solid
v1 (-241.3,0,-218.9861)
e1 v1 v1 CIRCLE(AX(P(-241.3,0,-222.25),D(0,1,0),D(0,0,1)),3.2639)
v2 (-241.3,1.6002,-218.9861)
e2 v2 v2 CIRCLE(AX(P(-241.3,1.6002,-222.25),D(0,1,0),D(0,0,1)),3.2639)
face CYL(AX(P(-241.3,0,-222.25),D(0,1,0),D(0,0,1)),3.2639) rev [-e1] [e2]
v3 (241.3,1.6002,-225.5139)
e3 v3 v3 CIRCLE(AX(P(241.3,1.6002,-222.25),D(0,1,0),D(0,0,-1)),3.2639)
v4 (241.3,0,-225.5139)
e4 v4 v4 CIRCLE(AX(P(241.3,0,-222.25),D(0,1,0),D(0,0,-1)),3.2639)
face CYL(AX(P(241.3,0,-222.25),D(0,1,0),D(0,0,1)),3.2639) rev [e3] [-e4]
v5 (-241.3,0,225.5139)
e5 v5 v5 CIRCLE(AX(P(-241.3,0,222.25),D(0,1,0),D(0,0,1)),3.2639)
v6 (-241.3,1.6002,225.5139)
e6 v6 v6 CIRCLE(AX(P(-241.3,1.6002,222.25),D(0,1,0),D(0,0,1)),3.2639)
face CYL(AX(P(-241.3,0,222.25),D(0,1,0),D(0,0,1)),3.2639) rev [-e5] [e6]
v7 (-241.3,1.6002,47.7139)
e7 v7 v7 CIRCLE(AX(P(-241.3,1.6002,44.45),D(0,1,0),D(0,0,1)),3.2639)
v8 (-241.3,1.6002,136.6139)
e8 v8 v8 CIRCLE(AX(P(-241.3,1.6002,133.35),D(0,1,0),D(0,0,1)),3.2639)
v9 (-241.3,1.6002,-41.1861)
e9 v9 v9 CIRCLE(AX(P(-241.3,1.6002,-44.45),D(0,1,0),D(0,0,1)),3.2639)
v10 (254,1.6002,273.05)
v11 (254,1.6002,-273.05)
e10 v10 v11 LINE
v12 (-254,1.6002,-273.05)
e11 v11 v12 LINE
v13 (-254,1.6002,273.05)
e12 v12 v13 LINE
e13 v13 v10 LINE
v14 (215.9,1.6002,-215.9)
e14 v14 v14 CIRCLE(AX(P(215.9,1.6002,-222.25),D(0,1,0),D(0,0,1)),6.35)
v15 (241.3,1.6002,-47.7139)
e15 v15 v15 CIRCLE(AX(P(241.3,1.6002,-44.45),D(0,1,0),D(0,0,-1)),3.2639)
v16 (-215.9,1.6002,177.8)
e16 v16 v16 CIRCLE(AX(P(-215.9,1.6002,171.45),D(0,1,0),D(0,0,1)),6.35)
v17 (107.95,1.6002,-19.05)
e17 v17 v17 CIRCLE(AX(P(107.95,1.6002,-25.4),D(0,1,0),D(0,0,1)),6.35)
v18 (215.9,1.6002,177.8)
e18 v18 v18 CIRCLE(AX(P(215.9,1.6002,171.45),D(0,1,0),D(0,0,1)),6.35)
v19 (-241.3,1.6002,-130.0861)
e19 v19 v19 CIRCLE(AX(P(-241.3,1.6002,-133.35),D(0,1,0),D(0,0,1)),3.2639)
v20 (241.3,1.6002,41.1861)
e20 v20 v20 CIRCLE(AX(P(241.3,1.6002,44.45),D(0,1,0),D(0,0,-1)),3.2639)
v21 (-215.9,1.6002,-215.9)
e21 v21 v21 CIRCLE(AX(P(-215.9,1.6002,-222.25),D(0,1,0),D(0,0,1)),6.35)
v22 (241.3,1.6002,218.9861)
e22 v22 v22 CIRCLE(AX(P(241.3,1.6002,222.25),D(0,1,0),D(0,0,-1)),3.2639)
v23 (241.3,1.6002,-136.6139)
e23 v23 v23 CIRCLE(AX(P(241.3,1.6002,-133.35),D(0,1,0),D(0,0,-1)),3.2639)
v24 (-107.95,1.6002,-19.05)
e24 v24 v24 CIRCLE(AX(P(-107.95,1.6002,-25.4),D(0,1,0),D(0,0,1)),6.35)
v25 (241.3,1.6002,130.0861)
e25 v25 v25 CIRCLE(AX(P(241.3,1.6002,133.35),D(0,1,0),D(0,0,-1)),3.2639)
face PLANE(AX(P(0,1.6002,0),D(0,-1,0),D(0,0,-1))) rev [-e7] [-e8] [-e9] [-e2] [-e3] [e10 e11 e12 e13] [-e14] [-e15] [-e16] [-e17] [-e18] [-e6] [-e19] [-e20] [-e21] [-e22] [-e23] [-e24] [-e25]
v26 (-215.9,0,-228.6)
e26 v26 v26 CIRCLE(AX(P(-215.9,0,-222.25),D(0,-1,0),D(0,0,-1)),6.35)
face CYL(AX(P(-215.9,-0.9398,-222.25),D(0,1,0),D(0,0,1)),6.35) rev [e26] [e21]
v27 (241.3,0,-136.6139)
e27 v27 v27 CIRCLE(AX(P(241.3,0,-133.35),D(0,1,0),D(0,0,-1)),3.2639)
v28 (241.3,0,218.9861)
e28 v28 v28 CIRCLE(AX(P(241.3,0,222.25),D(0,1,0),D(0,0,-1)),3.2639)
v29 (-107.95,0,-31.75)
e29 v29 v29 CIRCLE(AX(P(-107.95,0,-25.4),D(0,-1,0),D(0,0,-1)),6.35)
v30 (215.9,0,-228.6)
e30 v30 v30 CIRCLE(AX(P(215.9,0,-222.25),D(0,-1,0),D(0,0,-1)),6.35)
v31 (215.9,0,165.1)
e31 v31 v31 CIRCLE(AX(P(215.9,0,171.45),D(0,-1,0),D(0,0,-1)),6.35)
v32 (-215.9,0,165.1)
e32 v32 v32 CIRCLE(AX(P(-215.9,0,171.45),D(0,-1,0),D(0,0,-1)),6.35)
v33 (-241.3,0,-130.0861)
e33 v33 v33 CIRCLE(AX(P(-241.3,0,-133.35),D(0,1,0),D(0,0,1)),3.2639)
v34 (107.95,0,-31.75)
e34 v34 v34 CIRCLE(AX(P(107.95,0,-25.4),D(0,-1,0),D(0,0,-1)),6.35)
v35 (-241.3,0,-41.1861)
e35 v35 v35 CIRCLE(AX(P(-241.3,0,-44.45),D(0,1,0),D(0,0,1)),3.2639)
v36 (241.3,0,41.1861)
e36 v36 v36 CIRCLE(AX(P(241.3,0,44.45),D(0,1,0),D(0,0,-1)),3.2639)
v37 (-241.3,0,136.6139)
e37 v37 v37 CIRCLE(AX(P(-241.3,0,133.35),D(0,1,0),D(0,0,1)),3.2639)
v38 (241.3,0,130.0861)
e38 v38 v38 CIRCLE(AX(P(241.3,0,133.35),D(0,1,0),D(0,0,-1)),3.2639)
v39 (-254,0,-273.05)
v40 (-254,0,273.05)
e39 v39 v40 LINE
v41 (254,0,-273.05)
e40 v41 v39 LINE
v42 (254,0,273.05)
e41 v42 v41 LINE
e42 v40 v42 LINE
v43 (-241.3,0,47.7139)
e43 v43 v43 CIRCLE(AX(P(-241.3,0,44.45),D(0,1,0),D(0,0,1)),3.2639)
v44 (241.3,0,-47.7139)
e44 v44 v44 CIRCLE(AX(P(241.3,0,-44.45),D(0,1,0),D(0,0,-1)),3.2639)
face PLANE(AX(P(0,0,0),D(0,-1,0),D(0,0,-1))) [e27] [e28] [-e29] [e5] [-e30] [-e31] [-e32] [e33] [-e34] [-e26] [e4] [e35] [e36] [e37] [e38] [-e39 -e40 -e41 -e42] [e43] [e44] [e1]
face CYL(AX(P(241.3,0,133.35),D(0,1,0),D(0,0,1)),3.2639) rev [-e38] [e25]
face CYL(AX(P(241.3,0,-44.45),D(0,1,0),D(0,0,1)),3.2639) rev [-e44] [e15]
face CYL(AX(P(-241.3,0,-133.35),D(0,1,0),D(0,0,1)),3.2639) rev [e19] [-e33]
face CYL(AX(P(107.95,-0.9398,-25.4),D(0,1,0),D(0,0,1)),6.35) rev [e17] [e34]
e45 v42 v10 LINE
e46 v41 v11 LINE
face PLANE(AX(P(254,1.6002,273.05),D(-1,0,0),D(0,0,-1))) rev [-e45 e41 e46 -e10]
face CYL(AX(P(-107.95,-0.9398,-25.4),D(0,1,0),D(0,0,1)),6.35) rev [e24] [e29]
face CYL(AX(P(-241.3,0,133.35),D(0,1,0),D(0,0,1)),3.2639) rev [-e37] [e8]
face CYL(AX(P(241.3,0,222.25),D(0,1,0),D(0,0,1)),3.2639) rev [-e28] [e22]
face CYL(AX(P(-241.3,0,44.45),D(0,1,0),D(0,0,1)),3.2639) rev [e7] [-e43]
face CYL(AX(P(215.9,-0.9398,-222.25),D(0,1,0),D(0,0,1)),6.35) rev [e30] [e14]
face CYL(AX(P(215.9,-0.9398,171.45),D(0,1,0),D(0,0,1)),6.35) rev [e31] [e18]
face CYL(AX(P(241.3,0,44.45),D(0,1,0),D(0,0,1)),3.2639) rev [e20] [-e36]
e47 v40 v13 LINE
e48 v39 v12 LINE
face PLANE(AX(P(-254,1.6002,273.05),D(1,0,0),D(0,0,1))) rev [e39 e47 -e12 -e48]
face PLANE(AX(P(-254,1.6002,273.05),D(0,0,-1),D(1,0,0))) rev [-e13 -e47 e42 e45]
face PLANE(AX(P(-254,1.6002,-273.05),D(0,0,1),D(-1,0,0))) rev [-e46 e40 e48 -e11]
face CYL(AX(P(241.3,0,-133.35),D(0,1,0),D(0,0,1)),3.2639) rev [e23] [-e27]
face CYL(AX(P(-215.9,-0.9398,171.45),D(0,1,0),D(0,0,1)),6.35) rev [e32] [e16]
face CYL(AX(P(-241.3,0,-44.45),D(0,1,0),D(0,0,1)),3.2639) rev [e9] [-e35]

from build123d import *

# Parameters (mm, degrees)
SKETCH1_W           = 508
SKETCH1_H           = 546.1
BOSS_EXTRUDE1_DEPTH = 1.6002
SKETCH2_R           = 6.35
CUT_EXTRUDE1_DEPTH  = 2.54
SKETCH3_R           = 3.2639
CUT_EXTRUDE3_DEPTH  = 373.927423422
SKETCH4_R           = 6.35
CUT_EXTRUDE4_DEPTH  = 2.54


with BuildPart() as part:
    # Sketch1 → Boss-Extrude1 (new body)
    with BuildSketch(Plane(origin=(0, 0, 0), x_dir=(1, 0, 0), z_dir=(0, 1, 0))):
        Rectangle(SKETCH1_W, SKETCH1_H)
    extrude(amount=BOSS_EXTRUDE1_DEPTH)

    # Sketch2 → Cut-Extrude1 (cut)
    with BuildSketch(Plane(origin=(0, 1.6002, 0), x_dir=(1, 0, 0), z_dir=(0, 1, 0))):
        with Locations(Location((215.9, 222.25, 0), (0, 0, 270))):
            Circle(SKETCH2_R)
        with Locations(Location((215.9, -171.45, 0), (0, 0, 270))):
            Circle(SKETCH2_R)
        with Locations(Location((-215.9, 222.25, 0), (0, 0, 270))):
            Circle(SKETCH2_R)
        with Locations(Location((-215.9, -171.45, 0), (0, 0, 270))):
            Circle(SKETCH2_R)
    extrude(amount=-CUT_EXTRUDE1_DEPTH, mode=Mode.SUBTRACT)

    # Sketch3 → Cut-Extrude3 (cut, through all)
    with BuildSketch(Plane(origin=(0, 1.6002, 0), x_dir=(1, 0, 0), z_dir=(0, 1, 0))):
        with Locations(Location((-241.3, 222.25, 0), (0, 0, 270))):
            Circle(SKETCH3_R)
        with Locations(Location((-241.3, 133.35, 0), (0, 0, 270))):
            Circle(SKETCH3_R)
        with Locations(Location((-241.3, 44.45, 0), (0, 0, 270))):
            Circle(SKETCH3_R)
        with Locations(Location((-241.3, -44.45, 0), (0, 0, 270))):
            Circle(SKETCH3_R)
        with Locations(Location((-241.3, -133.35, 0), (0, 0, 270))):
            Circle(SKETCH3_R)
        with Locations(Location((-241.3, -222.25, 0), (0, 0, 270))):
            Circle(SKETCH3_R)
        with Locations(Location((241.3, 222.25, 0), (0, 0, 90))):
            Circle(SKETCH3_R)
        with Locations(Location((241.3, 133.35, 0), (0, 0, 90))):
            Circle(SKETCH3_R)
        with Locations(Location((241.3, 44.45, 0), (0, 0, 90))):
            Circle(SKETCH3_R)
        with Locations(Location((241.3, -44.45, 0), (0, 0, 90))):
            Circle(SKETCH3_R)
        with Locations(Location((241.3, -133.35, 0), (0, 0, 90))):
            Circle(SKETCH3_R)
        with Locations(Location((241.3, -222.25, 0), (0, 0, 90))):
            Circle(SKETCH3_R)
    extrude(amount=-CUT_EXTRUDE3_DEPTH, mode=Mode.SUBTRACT)

    # Sketch4 → Cut-Extrude4 (cut)
    with BuildSketch(Plane(origin=(0, 1.6002, 0), x_dir=(1, 0, 0), z_dir=(0, 1, 0))):
        with Locations(Location((107.95, 25.4, 0), (0, 0, 270))):
            Circle(SKETCH4_R)
        with Locations(Location((-107.95, 25.4, 0), (0, 0, 270))):
            Circle(SKETCH4_R)
    extrude(amount=-CUT_EXTRUDE4_DEPTH, mode=Mode.SUBTRACT)


solid = part.part
